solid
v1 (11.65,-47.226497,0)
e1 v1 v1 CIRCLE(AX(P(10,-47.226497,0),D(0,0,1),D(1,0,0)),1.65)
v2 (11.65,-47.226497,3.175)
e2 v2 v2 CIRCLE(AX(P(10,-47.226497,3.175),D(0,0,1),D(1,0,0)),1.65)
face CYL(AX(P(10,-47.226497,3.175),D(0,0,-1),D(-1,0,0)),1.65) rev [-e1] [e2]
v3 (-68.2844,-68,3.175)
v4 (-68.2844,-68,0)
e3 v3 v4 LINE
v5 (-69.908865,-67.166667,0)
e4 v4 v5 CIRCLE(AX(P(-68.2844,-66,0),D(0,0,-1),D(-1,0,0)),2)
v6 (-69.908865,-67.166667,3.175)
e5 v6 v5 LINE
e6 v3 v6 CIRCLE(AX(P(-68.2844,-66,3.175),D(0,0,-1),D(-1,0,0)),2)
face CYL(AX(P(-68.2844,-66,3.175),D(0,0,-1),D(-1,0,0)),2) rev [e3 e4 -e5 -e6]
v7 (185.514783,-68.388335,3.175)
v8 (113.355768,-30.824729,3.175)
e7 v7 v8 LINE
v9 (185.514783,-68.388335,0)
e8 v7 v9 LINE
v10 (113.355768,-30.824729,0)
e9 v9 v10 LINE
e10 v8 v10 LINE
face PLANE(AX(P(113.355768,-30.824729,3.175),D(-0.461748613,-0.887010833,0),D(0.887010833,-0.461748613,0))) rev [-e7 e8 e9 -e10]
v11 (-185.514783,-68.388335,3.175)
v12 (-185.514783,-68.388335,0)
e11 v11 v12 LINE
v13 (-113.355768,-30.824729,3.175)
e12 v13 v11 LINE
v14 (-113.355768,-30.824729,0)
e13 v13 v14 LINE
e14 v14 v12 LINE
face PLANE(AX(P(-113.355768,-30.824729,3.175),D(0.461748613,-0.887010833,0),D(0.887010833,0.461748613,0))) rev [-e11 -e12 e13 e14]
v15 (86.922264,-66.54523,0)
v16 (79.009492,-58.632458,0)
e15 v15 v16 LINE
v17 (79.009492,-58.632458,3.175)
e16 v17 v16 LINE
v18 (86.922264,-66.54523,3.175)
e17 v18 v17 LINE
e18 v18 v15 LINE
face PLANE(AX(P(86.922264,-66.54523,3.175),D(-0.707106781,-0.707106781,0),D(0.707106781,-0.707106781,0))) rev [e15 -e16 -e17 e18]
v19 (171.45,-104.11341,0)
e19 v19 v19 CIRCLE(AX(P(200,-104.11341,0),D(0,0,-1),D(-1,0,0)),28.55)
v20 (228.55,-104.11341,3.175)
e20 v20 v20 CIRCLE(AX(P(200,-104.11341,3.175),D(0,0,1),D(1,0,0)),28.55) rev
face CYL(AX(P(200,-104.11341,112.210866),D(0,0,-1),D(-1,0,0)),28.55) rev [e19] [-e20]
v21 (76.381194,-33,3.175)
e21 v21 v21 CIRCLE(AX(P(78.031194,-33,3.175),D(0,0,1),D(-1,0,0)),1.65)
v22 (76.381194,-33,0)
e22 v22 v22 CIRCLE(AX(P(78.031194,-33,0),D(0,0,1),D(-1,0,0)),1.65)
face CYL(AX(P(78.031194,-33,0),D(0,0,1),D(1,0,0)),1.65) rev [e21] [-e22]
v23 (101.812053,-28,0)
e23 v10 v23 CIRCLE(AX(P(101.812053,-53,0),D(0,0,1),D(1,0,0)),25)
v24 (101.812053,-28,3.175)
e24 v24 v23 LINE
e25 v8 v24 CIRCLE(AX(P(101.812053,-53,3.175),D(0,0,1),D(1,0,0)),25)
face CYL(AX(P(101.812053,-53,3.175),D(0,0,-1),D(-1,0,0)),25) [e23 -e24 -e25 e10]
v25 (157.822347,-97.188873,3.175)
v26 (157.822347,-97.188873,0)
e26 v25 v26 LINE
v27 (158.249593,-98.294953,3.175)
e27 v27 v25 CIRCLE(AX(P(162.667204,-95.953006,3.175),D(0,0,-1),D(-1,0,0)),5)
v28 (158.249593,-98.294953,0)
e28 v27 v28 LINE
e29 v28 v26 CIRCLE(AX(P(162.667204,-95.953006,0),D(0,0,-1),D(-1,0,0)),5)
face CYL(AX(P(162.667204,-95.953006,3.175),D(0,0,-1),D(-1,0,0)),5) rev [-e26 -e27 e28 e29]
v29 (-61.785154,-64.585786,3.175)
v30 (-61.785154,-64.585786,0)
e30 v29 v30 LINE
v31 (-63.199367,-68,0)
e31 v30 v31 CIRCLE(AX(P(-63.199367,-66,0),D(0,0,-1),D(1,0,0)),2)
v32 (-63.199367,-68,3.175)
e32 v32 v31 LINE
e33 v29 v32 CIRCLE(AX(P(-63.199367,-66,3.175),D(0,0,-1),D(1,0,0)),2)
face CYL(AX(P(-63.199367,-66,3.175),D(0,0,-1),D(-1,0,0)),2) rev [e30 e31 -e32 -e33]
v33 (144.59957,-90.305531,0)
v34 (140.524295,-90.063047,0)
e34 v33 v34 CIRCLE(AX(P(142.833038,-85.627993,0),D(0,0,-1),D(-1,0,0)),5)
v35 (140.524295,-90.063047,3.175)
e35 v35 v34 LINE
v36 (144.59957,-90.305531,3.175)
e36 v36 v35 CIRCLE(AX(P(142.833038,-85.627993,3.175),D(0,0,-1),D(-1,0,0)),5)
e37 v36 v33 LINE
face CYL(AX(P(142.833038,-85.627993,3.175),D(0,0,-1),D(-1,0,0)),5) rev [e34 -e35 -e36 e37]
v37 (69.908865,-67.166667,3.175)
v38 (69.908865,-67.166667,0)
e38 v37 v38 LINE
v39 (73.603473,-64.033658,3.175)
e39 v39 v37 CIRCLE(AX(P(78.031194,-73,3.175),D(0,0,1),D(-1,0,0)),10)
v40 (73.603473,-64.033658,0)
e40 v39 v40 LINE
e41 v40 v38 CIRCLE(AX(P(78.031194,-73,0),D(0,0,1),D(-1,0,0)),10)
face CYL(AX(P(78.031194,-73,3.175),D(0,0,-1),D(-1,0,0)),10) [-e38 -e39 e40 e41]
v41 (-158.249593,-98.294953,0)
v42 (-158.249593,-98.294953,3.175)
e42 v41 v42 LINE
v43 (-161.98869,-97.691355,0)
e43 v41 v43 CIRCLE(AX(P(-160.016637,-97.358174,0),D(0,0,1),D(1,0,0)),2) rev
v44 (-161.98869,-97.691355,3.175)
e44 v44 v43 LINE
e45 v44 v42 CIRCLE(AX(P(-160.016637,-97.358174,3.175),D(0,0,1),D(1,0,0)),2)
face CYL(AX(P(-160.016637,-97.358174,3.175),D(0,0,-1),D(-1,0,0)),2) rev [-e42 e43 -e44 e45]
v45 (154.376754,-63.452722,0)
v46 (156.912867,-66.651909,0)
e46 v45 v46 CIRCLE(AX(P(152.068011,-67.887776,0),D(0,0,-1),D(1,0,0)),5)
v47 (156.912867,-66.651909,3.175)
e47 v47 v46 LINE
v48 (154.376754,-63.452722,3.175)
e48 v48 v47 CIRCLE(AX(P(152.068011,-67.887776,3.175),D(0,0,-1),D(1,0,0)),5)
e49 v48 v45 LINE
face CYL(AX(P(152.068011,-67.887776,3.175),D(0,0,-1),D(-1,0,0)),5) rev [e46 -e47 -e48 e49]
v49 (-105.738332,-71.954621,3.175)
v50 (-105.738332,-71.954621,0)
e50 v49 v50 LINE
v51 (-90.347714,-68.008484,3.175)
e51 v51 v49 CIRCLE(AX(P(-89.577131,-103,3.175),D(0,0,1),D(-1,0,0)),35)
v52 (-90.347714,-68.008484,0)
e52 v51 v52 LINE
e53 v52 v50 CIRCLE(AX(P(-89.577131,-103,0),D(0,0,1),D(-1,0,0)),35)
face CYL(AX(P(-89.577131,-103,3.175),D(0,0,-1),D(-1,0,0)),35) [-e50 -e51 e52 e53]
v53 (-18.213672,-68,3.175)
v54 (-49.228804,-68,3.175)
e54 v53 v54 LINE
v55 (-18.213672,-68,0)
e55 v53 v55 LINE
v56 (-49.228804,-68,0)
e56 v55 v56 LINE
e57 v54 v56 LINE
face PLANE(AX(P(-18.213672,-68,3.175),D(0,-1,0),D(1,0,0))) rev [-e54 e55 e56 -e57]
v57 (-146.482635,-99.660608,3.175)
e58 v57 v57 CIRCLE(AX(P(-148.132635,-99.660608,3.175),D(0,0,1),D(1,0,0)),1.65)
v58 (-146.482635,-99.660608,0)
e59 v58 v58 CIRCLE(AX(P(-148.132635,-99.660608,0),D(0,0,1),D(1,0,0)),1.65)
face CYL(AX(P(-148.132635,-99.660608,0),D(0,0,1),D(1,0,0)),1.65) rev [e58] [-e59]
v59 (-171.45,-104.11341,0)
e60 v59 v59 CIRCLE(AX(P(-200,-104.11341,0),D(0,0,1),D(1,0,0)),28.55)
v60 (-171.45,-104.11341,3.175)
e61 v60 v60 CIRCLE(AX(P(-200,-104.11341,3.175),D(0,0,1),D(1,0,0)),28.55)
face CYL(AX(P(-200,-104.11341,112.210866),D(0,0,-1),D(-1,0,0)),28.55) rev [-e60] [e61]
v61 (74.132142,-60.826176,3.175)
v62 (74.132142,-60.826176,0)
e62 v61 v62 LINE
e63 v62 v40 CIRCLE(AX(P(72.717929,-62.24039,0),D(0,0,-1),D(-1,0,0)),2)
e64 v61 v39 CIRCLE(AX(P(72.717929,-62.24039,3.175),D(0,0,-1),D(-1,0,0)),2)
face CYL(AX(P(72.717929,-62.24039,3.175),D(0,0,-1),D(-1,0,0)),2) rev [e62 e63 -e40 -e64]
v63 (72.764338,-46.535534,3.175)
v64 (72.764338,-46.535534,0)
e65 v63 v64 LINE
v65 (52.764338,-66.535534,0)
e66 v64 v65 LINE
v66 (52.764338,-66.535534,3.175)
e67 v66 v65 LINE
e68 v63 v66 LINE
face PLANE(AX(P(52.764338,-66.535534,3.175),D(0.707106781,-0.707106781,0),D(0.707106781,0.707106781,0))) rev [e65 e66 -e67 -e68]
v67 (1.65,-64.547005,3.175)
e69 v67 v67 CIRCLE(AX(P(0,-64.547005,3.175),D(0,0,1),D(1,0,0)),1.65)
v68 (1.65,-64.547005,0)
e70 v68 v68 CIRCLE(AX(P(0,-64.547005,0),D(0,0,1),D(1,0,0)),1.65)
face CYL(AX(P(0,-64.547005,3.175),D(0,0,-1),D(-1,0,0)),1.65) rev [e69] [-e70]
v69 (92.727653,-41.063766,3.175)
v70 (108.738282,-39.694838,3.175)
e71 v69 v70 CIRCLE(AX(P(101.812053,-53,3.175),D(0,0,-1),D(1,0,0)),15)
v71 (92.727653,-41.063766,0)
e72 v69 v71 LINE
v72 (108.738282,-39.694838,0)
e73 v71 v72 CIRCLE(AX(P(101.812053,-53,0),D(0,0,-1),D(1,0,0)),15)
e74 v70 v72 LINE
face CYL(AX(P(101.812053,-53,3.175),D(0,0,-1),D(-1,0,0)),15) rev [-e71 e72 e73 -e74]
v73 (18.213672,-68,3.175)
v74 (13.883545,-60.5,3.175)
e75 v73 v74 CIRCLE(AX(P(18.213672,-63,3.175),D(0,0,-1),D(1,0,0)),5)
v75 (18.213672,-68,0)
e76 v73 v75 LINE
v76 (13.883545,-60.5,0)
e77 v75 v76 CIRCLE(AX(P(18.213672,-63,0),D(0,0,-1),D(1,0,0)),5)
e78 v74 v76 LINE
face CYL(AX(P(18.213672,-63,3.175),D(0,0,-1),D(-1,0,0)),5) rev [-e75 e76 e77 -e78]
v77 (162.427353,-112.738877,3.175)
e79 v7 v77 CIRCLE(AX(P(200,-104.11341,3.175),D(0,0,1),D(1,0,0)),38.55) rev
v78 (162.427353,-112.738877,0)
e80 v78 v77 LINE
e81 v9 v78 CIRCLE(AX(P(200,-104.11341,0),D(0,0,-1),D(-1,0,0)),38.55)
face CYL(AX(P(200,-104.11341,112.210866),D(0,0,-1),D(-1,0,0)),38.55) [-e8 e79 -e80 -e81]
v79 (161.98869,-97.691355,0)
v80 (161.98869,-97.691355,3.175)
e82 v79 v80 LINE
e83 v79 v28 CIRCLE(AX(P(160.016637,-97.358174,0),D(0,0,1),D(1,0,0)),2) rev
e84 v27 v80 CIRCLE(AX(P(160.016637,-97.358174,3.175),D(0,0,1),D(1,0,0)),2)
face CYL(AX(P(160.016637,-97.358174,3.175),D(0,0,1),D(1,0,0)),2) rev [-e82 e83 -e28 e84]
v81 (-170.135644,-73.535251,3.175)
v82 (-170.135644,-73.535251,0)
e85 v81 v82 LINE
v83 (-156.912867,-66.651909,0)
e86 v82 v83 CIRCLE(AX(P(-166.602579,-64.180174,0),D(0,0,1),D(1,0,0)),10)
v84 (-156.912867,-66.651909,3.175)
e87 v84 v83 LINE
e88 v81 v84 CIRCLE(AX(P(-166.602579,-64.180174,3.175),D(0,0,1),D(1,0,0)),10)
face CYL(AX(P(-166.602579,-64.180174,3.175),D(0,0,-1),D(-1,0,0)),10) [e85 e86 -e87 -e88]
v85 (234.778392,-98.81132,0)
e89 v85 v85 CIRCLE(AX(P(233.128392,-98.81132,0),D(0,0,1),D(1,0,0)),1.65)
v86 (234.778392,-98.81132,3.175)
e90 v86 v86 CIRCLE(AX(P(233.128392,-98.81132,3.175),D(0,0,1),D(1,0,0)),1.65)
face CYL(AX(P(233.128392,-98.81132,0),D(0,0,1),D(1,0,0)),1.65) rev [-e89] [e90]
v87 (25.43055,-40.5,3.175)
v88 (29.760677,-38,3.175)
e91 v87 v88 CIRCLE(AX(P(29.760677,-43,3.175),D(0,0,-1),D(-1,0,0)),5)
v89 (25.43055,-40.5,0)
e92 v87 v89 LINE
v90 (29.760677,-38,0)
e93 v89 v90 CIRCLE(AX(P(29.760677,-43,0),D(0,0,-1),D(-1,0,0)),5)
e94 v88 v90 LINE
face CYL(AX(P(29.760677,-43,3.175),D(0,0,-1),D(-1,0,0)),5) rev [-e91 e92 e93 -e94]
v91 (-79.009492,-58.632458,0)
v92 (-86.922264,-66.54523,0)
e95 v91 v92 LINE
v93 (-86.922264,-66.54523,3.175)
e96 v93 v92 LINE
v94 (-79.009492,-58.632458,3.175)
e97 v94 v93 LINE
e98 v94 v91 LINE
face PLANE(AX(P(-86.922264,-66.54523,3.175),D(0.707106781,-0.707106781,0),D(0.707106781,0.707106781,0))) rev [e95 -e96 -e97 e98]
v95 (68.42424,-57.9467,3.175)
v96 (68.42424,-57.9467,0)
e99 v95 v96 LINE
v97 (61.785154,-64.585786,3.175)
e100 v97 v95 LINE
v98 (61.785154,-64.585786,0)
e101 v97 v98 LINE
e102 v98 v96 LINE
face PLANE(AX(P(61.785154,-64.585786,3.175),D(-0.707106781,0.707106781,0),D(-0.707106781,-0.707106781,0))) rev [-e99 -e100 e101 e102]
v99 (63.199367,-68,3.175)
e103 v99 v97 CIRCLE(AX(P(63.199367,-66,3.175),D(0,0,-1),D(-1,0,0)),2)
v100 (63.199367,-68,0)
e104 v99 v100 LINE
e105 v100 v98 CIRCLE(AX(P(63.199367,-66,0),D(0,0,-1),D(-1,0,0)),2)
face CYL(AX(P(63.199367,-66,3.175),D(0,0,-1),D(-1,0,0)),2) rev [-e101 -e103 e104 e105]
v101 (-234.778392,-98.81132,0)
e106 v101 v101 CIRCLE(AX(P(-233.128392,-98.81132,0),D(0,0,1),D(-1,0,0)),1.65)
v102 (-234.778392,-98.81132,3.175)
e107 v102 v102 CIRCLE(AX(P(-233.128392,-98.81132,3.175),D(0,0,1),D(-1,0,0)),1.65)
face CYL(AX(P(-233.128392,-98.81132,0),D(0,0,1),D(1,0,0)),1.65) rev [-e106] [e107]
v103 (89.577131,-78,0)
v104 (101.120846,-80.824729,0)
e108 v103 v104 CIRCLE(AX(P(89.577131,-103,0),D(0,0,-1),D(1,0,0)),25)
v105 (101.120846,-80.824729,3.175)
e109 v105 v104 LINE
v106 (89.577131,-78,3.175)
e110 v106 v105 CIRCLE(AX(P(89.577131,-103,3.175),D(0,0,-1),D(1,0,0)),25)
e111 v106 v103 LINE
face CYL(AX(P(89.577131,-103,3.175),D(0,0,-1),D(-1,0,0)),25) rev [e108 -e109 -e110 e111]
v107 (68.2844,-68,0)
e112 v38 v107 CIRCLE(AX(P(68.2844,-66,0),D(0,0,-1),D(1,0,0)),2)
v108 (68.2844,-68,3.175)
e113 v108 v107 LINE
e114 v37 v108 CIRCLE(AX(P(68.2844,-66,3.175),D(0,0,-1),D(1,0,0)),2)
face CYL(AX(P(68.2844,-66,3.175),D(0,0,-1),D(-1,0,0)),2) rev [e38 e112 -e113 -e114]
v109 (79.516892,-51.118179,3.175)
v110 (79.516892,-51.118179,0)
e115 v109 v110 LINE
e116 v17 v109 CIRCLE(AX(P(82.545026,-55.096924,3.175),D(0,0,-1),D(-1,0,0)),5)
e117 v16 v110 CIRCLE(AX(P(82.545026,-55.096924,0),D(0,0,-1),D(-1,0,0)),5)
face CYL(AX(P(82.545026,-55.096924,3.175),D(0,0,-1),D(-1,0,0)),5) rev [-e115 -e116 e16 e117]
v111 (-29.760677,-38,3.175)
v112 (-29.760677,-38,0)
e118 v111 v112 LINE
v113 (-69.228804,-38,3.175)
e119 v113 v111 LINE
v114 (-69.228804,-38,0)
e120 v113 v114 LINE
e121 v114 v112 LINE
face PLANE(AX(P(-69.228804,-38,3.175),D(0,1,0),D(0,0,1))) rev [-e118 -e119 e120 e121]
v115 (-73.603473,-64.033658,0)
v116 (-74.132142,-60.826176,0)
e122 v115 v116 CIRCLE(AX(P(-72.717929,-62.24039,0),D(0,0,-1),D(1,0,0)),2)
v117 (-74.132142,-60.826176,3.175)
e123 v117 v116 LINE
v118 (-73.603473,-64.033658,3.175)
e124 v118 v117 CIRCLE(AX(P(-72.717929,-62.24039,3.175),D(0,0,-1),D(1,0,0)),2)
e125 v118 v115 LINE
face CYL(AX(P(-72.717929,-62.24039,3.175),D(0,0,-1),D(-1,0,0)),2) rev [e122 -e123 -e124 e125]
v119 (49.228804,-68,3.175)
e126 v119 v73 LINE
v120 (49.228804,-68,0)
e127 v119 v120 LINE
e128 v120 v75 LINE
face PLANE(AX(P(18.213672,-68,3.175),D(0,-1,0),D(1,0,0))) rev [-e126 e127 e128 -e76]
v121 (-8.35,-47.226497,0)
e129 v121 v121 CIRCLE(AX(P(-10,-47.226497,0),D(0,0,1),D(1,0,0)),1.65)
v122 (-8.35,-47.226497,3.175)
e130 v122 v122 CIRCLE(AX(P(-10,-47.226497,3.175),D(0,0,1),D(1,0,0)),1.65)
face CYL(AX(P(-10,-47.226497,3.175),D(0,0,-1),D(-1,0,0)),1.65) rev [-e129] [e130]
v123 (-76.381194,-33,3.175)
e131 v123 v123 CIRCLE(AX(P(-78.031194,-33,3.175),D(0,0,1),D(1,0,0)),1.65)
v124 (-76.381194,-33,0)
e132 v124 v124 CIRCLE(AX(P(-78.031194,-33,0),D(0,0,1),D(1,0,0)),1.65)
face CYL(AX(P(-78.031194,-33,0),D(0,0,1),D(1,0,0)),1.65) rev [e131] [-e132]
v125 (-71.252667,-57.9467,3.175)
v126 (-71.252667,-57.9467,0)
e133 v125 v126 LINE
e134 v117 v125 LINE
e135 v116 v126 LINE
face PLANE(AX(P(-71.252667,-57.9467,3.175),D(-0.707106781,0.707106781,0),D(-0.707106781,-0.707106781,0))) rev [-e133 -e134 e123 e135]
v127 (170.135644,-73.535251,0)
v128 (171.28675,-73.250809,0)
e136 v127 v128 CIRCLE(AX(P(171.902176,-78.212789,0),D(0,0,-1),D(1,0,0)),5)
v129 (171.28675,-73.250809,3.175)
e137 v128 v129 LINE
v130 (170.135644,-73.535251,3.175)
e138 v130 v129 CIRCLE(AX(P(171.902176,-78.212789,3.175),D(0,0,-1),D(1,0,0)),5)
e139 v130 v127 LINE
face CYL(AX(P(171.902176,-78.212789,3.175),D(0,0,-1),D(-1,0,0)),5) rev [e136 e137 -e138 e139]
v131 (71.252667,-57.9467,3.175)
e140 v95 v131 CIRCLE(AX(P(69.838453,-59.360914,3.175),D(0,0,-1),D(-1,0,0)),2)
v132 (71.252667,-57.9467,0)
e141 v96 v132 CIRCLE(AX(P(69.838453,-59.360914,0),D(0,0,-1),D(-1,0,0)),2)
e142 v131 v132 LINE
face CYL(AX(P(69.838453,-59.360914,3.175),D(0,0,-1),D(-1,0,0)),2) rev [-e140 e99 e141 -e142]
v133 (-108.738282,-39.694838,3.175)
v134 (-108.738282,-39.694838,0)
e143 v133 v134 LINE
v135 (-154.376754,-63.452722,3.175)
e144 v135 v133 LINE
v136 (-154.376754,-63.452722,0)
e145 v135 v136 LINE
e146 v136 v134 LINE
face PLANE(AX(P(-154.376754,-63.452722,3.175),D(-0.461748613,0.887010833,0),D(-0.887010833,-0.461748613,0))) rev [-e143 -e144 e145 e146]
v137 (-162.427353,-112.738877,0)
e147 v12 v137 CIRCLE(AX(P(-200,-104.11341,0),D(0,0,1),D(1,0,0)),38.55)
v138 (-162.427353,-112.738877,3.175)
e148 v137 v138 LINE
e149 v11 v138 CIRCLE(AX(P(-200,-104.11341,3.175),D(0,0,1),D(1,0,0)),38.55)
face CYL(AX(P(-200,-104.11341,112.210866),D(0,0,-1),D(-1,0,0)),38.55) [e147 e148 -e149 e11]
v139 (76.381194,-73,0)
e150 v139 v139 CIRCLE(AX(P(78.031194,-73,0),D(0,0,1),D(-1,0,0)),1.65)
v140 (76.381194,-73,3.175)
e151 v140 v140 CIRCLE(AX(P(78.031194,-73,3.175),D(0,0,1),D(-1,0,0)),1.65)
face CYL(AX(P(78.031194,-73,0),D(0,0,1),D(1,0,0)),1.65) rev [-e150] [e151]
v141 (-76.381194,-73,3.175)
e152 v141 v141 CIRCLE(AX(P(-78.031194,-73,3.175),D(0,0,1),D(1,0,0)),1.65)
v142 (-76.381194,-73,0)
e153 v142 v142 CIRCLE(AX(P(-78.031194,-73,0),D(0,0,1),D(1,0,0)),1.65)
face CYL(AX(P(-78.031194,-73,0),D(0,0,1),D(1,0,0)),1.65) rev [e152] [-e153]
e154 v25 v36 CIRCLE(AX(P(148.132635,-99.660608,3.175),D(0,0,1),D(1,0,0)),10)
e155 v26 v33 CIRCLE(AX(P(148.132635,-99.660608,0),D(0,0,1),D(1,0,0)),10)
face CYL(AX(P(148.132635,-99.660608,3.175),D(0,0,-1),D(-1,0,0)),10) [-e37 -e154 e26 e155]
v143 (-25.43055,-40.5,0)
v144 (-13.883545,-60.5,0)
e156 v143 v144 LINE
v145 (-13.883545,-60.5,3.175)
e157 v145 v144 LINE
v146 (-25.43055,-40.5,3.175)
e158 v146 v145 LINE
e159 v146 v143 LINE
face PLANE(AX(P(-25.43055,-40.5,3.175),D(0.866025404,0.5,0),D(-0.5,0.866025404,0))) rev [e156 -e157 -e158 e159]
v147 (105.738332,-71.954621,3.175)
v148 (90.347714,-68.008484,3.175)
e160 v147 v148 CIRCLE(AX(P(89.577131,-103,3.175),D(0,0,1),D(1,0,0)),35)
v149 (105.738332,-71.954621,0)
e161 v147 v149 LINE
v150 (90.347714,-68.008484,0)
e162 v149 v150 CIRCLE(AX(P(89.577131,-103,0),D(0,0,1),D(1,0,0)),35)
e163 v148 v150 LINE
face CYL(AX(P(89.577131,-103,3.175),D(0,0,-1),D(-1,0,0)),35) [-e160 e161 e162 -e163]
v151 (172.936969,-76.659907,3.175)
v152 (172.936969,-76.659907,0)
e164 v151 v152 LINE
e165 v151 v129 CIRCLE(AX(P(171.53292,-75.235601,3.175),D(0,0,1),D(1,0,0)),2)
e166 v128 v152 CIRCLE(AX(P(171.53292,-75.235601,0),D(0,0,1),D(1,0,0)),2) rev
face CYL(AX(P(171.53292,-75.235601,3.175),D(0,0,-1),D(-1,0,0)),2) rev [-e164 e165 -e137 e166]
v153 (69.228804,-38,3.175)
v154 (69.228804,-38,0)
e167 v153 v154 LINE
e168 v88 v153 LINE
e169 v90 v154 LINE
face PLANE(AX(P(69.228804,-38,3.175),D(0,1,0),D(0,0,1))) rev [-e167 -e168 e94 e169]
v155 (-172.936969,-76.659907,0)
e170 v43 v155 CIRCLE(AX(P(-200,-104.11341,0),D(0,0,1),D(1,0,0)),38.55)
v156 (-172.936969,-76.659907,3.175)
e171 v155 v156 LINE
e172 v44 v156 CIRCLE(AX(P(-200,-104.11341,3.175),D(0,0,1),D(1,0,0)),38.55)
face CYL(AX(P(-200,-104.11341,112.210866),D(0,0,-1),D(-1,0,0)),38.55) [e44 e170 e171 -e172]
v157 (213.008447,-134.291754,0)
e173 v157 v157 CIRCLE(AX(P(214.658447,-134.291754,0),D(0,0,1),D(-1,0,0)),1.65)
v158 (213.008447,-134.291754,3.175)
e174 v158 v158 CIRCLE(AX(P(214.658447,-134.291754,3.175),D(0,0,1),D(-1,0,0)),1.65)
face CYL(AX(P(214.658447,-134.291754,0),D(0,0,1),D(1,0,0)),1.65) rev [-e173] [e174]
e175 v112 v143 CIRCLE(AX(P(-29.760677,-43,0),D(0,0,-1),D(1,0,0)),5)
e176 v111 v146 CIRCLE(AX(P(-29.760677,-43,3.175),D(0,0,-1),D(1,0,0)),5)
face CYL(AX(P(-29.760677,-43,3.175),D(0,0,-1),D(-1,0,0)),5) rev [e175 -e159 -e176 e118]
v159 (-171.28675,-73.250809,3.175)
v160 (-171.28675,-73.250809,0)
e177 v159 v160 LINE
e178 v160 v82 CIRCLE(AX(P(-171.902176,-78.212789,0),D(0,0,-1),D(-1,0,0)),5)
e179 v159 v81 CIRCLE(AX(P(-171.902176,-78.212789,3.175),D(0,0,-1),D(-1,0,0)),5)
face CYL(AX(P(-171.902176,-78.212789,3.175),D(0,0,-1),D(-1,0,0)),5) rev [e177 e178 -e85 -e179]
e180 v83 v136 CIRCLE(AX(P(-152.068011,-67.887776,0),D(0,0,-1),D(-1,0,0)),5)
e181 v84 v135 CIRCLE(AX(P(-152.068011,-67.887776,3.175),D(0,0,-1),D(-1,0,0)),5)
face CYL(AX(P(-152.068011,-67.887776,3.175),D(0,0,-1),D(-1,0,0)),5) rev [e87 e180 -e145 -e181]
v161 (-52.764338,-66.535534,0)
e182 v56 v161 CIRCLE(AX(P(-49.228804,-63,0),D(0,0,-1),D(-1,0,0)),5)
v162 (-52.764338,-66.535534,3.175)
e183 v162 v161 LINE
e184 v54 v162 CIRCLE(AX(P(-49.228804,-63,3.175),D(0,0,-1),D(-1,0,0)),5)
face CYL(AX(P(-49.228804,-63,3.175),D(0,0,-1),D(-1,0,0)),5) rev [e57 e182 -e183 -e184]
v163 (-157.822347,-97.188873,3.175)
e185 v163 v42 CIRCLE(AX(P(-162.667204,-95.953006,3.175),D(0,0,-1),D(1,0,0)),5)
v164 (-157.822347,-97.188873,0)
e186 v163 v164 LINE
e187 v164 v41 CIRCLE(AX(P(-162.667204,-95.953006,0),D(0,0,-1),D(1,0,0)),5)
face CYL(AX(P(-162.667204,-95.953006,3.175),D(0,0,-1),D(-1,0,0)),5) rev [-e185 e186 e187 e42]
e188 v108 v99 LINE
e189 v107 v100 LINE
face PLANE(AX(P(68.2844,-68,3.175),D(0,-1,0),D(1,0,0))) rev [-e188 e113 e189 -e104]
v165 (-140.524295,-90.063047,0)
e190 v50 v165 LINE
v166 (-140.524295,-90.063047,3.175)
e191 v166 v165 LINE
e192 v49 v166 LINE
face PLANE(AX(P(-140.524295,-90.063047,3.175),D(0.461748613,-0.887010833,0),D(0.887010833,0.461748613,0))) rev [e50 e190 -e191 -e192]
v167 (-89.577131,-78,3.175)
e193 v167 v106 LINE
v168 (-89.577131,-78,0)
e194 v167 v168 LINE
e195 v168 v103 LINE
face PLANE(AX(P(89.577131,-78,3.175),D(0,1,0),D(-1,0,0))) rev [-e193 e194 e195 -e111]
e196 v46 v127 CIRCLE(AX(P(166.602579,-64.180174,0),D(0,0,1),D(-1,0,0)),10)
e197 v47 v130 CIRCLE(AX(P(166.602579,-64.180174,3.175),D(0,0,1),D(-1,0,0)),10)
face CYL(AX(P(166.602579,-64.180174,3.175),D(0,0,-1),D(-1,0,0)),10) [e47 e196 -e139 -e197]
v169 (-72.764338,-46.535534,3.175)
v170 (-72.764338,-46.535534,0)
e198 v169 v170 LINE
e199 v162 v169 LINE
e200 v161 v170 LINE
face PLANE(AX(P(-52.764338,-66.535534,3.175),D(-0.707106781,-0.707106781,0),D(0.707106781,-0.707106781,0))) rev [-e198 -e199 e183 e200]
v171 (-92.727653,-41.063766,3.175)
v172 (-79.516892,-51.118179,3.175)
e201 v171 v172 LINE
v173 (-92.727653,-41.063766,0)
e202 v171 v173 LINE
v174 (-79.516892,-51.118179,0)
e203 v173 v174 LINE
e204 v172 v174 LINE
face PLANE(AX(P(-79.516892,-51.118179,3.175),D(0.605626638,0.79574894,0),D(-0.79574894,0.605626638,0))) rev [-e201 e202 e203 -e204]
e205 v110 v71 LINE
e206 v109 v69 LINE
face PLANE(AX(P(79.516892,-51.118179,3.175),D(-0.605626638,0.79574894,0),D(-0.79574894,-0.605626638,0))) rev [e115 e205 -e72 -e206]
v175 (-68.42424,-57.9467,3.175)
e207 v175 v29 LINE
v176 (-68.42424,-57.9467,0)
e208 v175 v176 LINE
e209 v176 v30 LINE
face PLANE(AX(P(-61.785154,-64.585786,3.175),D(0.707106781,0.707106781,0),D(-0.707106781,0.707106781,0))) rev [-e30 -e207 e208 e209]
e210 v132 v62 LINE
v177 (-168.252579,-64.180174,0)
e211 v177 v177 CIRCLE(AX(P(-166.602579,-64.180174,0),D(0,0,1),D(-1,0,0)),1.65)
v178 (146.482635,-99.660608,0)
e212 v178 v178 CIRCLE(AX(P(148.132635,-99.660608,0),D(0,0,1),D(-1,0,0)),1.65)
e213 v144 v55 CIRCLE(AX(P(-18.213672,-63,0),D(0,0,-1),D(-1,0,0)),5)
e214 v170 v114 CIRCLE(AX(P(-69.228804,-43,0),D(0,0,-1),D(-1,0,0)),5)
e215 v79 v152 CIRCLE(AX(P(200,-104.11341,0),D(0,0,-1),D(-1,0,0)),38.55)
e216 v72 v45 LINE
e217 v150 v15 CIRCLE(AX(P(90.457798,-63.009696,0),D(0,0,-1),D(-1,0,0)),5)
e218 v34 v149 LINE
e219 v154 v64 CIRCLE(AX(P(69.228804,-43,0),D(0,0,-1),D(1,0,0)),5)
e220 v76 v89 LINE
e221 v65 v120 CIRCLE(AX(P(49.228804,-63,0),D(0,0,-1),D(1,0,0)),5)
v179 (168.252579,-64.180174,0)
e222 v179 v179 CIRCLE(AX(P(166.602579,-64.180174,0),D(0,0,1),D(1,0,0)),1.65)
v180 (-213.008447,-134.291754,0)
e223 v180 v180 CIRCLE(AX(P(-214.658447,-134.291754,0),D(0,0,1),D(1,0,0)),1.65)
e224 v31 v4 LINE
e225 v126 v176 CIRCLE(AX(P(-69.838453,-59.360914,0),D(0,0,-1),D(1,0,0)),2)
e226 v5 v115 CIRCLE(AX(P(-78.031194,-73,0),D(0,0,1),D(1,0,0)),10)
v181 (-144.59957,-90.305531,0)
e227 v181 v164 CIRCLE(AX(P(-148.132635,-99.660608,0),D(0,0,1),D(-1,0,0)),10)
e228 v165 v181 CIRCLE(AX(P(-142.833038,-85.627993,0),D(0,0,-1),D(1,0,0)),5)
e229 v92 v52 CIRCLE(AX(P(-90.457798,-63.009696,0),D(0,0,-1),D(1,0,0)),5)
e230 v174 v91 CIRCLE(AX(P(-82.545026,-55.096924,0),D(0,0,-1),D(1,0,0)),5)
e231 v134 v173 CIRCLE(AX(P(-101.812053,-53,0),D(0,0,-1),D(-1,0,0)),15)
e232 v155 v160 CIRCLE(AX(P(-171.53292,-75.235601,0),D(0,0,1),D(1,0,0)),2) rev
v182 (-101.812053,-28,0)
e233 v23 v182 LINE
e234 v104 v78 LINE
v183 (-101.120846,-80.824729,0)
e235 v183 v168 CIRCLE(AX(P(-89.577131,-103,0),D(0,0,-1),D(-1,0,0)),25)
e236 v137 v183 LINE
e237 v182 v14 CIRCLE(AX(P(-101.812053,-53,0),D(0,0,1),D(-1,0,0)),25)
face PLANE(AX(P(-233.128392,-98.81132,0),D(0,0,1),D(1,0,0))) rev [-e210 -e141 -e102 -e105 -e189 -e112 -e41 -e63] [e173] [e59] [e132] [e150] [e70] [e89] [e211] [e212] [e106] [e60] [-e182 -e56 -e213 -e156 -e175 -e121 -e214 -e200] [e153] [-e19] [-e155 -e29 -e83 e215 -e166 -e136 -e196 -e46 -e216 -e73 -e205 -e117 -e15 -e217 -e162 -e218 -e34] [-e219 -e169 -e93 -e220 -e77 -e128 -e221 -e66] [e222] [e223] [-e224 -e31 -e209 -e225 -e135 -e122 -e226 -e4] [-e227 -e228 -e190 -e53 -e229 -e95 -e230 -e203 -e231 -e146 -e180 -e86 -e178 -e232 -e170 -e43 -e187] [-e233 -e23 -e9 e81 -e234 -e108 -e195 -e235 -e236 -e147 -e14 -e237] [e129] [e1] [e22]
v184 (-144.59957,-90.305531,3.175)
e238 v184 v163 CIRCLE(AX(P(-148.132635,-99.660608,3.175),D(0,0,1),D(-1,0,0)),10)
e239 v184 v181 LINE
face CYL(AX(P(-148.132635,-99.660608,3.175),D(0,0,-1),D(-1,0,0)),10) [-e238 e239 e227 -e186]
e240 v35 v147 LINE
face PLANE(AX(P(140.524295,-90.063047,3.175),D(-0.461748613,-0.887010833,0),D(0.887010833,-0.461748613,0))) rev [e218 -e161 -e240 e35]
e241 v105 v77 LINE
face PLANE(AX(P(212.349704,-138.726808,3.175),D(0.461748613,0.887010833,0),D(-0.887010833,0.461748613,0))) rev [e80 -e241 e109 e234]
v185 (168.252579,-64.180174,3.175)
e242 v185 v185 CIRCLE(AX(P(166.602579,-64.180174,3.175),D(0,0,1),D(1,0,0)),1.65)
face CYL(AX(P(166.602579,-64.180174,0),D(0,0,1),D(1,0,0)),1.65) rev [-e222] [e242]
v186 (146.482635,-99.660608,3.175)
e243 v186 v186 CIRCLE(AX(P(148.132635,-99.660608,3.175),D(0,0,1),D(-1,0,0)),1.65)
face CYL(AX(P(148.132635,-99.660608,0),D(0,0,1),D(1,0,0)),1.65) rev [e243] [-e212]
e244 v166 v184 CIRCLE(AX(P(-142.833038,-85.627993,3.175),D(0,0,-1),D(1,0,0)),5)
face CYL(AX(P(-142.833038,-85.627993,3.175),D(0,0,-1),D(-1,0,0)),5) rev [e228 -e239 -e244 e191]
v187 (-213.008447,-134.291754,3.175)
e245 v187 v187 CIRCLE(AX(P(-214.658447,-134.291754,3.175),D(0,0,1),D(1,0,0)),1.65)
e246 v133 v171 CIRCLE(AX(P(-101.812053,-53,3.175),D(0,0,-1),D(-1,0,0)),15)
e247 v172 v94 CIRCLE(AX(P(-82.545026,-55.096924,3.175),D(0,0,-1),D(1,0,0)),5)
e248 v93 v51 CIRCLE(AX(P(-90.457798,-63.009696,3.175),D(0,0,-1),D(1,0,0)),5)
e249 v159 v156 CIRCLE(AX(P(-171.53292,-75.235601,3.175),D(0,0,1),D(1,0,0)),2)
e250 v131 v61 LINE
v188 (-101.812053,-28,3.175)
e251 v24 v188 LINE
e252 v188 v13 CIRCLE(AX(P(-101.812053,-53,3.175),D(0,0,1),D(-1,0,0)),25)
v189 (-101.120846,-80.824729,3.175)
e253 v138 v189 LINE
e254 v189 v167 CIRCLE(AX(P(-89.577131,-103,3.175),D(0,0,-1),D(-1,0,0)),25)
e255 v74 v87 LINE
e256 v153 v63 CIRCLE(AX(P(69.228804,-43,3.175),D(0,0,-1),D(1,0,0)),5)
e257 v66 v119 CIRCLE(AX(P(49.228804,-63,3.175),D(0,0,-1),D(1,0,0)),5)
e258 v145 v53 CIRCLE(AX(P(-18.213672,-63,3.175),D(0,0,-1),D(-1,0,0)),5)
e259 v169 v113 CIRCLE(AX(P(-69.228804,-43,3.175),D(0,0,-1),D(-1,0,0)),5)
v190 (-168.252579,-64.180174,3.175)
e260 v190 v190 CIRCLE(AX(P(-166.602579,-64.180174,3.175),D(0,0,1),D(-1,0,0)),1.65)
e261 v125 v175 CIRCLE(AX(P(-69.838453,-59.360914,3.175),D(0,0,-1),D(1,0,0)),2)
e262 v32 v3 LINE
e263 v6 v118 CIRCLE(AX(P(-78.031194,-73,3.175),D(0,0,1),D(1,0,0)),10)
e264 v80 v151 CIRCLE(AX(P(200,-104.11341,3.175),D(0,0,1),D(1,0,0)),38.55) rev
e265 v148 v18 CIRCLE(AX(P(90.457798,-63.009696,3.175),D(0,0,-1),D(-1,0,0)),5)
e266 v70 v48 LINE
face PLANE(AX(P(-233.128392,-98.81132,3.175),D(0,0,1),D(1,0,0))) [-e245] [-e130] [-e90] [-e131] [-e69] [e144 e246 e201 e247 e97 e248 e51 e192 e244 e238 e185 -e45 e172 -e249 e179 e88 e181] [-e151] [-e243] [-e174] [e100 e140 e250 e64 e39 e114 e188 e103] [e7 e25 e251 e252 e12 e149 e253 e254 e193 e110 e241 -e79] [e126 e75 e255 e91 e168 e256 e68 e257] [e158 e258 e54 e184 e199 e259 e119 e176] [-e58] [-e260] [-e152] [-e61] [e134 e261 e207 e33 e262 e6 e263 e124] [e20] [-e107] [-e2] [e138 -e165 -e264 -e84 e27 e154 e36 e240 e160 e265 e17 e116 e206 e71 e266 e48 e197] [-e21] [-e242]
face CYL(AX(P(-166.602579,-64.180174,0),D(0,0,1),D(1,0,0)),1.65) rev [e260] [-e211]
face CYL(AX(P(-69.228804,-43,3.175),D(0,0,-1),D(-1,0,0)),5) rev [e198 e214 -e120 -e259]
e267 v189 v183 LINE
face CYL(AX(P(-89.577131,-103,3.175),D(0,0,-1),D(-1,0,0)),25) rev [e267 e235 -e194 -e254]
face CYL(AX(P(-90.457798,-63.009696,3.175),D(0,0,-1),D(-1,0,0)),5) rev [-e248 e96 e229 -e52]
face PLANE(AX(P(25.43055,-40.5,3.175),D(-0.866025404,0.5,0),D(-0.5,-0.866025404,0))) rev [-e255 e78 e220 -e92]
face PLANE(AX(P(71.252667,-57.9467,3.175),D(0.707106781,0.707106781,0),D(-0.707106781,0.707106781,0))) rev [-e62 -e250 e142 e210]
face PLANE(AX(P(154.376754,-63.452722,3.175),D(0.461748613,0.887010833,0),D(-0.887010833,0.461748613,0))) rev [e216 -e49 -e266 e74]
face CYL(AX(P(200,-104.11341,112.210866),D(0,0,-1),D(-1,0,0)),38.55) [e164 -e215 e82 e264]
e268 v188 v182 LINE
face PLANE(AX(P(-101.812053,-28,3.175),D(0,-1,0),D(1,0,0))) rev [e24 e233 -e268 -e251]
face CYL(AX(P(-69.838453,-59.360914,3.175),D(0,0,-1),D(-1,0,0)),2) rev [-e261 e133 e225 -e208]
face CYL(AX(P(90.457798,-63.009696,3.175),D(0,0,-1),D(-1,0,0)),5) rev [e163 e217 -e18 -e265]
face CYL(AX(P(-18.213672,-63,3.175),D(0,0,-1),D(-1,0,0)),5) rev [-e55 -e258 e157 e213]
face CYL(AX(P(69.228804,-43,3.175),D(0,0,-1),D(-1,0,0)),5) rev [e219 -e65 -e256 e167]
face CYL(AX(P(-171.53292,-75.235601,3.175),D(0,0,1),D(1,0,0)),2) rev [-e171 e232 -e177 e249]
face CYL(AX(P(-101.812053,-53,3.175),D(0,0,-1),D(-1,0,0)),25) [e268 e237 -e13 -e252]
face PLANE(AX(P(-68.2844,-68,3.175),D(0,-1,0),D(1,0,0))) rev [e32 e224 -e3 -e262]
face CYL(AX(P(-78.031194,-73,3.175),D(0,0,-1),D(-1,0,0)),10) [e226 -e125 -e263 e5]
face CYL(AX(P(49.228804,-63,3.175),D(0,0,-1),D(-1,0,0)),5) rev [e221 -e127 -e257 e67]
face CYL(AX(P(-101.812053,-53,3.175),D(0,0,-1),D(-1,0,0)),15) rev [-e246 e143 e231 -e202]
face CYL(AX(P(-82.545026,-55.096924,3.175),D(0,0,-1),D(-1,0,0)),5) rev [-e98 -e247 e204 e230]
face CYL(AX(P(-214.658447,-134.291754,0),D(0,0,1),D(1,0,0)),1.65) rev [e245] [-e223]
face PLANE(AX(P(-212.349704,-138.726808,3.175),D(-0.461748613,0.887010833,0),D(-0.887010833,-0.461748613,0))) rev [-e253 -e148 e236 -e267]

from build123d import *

# Parameters (mm, degrees)
SKETCH1_R              = 16.05
SKETCH1_R_2            = 1.65
BASE_DEPTH             = 3.175
SKETCH3_R              = 1.65
STRUT_HOLES_DEPTH      = 276.893827895
LIGHTENING_HOLES_DEPTH = 276.893827895
INNER_START            = -3.175
SKETCH5_R              = 38.55
SKETCH5_R_2            = 28.55
SKETCH5_R_3            = 1.65
INNER_MOD_BOSS_DEPTH   = 3.175
SKETCH5_2_R            = 28.55
INNER_MOD_CUT_DEPTH    = 278.97307731
FILLET1_R              = 2
FILLET2_R              = 2
FILLET3_R              = 2
FILLET4_R              = 2


with BuildPart() as part:
    # Sketch1 → Base (new body)
    with BuildSketch(Plane.XY):
        with BuildLine():
            Line((-113.35576806, -30.824729171), (-235.437134887, -94.376266227))
            ThreePointArc((-235.437134887, -94.376266227), (-237.896976574, -97.307791395), (-237.563445987, -101.120063459))
            Line((-237.563445987, -101.120063459), (-219.093501457, -136.600496786))
            ThreePointArc((-219.093501457, -136.600496786), (-216.161976289, -139.060338474), (-212.349704225, -138.726807886))
            Line((-212.349704225, -138.726807886), (-101.120845899, -80.824729171))
            ThreePointArc((-101.120845899, -80.824729171), (-95.519277876, -78.716448255), (-89.577130568, -78))
            Line((-89.577130568, -78), (89.577130568, -78))
            ThreePointArc((89.577130568, -78), (95.519277876, -78.716448255), (101.120845899, -80.824729171))
            Line((101.120845899, -80.824729171), (212.349704225, -138.726807886))
            ThreePointArc((212.349704225, -138.726807886), (216.161976289, -139.060338474), (219.093501457, -136.600496786))
            Line((219.093501457, -136.600496786), (237.563445987, -101.120063459))
            ThreePointArc((237.563445987, -101.120063459), (237.896976574, -97.307791395), (235.437134887, -94.376266227))
            Line((235.437134887, -94.376266227), (113.35576806, -30.824729171))
            ThreePointArc((113.35576806, -30.824729171), (107.754200038, -28.716448255), (101.812052729, -28))
            Line((101.812052729, -28), (-101.812052729, -28))
            ThreePointArc((-101.812052729, -28), (-107.754200038, -28.716448255), (-113.35576806, -30.824729171))
        make_face()
        with Locations((-200, -104.11341011)):
            Circle(SKETCH1_R, mode=Mode.SUBTRACT)
        with Locations((-221.458631392, -97.347529622)):
            Circle(SKETCH1_R_2, mode=Mode.SUBTRACT)
        with Locations((-193.234119511, -82.654778719)):
            Circle(SKETCH1_R_2, mode=Mode.SUBTRACT)
        with Locations((-178.541368608, -110.879290599)):
            Circle(SKETCH1_R_2, mode=Mode.SUBTRACT)
        with Locations((-206.765880489, -125.572041502)):
            Circle(SKETCH1_R_2, mode=Mode.SUBTRACT)
        with Locations(Location((206.765880489, -125.572041502, 0), (0, 0, 180))):
            Circle(SKETCH1_R_2, mode=Mode.SUBTRACT)
        with Locations(Location((221.458631392, -97.347529622, 0), (0, 0, 180))):
            Circle(SKETCH1_R_2, mode=Mode.SUBTRACT)
        with Locations(Location((193.234119511, -82.654778719, 0), (0, 0, 180))):
            Circle(SKETCH1_R_2, mode=Mode.SUBTRACT)
        with Locations(Location((178.541368608, -110.879290599, 0), (0, 0, 180))):
            Circle(SKETCH1_R_2, mode=Mode.SUBTRACT)
        with Locations(Location((200, -104.11341011, 0), (0, 0, 180))):
            Circle(SKETCH1_R, mode=Mode.SUBTRACT)
        with Locations((-10, -47.226497308)):
            Circle(SKETCH1_R_2, mode=Mode.SUBTRACT)
        with Locations((10, -47.226497308)):
            Circle(SKETCH1_R_2, mode=Mode.SUBTRACT)
        with Locations((0, -64.547005384)):
            Circle(SKETCH1_R_2, mode=Mode.SUBTRACT)
    extrude(amount=BASE_DEPTH)

    # Sketch3 → Strut Holes (cut, through all)
    with BuildSketch(Plane.XY.offset(3.175)):
        with Locations((-214.658447291, -134.29175372)):
            Circle(SKETCH3_R)
        with Locations((-148.132634803, -99.660607727)):
            Circle(SKETCH3_R)
        with Locations((-78.03119405, -73)):
            Circle(SKETCH3_R)
        with Locations((-78.03119405, -33)):
            Circle(SKETCH3_R)
        with Locations(Location((-166.602579332, -64.1801744, 0), (0, 0, 180))):
            Circle(SKETCH3_R)
        with Locations(Location((-233.128391821, -98.811320393, 0), (0, 0, 180))):
            Circle(SKETCH3_R)
        with Locations((233.128391821, -98.811320393)):
            Circle(SKETCH3_R)
        with Locations((166.602579332, -64.1801744)):
            Circle(SKETCH3_R)
        with Locations(Location((78.03119405, -33, 0), (0, 0, 180))):
            Circle(SKETCH3_R)
        with Locations(Location((78.03119405, -73, 0), (0, 0, 180))):
            Circle(SKETCH3_R)
        with Locations(Location((148.132634803, -99.660607727, 0), (0, 0, 180))):
            Circle(SKETCH3_R)
        with Locations(Location((214.658447291, -134.29175372, 0), (0, 0, 180))):
            Circle(SKETCH3_R)
    extrude(amount=-STRUT_HOLES_DEPTH, mode=Mode.SUBTRACT)

    # Sketch4 → Lightening Holes (cut, through all)
    with BuildSketch(Plane(origin=(0, 0, 0), x_dir=(-1, 0, 0), z_dir=(0, 0, -1))):
        with BuildLine():
            Line((-166.732564066, -103.70620831), (-160.358460468, -100.38806))
            ThreePointArc((-160.358460468, -100.38806), (-158.749015825, -99.059097441), (-157.82234729, -97.188873132))
            ThreePointArc((-157.82234729, -97.188873132), (-152.750120935, -90.790499395), (-144.599570492, -90.305531214))
            ThreePointArc((-144.599570492, -90.305531214), (-142.53605719, -90.619165384), (-140.52429527, -90.063047123))
            Line((-140.52429527, -90.063047123), (-105.738332031, -71.954620839))
            ThreePointArc((-105.738332031, -71.954620839), (-98.269905543, -69.096671797), (-90.347714306, -68.008483875))
            ThreePointArc((-90.347714306, -68.008483875), (-88.493641512, -67.607748759), (-86.922263791, -66.545229763))
            Line((-86.922263791, -66.545229763), (-79.009491694, -58.632457666))
            ThreePointArc((-79.009491694, -58.632457666), (-77.556385787, -54.760066484), (-79.516892411, -51.11817906))
            Line((-79.516892411, -51.11817906), (-92.727653164, -41.063765898))
            ThreePointArc((-92.727653164, -41.063765898), (-100.534196684, -38.054529652), (-108.738281928, -39.694837502))
            Line((-108.738281928, -39.694837502), (-154.376753667, -63.452722127))
            ThreePointArc((-154.376753667, -63.452722127), (-155.986198311, -64.781684686), (-156.912866845, -66.651908996))
            ThreePointArc((-156.912866845, -66.651908996), (-161.9850932, -73.050282732), (-170.135643643, -73.535250914))
            ThreePointArc((-170.135643643, -73.535250914), (-172.199156946, -73.221616743), (-174.210918865, -73.777735004))
            Line((-174.210918865, -73.777735004), (-180.585022463, -77.095883315))
            ThreePointArc((-180.585022463, -77.095883315), (-182.645072259, -79.099137955), (-183.262226102, -81.905551227))
            ThreePointArc((-183.262226102, -81.905551227), (-183.239750678, -82.990325484), (-183.334932996, -84.071149549))
            ThreePointArc((-183.334932996, -84.071149549), (-183.171057415, -86.227404823), (-182.1120053, -88.112796196))
            ThreePointArc((-182.1120053, -88.112796196), (-178.711740004, -93.031443393), (-176.632932149, -98.637997792))
            ThreePointArc((-176.632932149, -98.637997792), (-175.695957289, -100.586938562), (-174.023651545, -101.957954795))
            ThreePointArc((-174.023651545, -101.957954795), (-173.083697968, -102.499921221), (-172.207994291, -103.140532962))
            ThreePointArc((-172.207994291, -103.140532962), (-169.555130221, -104.244682653), (-166.732564066, -103.70620831))
        make_face()
        with BuildLine():
            Line((-68.284399705, -68), (-63.199367137, -68))
            ThreePointArc((-63.199367137, -68), (-61.351608072, -66.765366865), (-61.785153575, -64.585786438))
            Line((-61.785153575, -64.585786438), (-68.424239552, -57.946700461))
            ThreePointArc((-68.424239552, -57.946700461), (-69.838453114, -57.360914023), (-71.252666676, -57.946700461))
            Line((-71.252666676, -57.946700461), (-74.132142401, -60.826176185))
            ThreePointArc((-74.132142401, -60.826176185), (-74.691303243, -62.565648815), (-73.60347304, -64.033658123))
            ThreePointArc((-73.60347304, -64.033658123), (-71.563592326, -65.373065627), (-69.908865429, -67.166666667))
            ThreePointArc((-69.908865429, -67.166666667), (-69.197270634, -67.779513042), (-68.284399705, -68))
        make_face()
        with BuildLine():
            Line((-25.430550415, -40.5), (-13.883545032, -60.5))
            ThreePointArc((-13.883545032, -60.5), (-13.883545032, -65.5), (-18.21367205, -68))
            Line((-18.21367205, -68), (-49.228804389, -68))
            ThreePointArc((-49.228804389, -68), (-51.14222155, -67.619397663), (-52.764338294, -66.535533906))
            Line((-52.764338294, -66.535533906), (-72.764338294, -46.535533906))
            ThreePointArc((-72.764338294, -46.535533906), (-73.848202051, -41.086582838), (-69.228804389, -38))
            Line((-69.228804389, -38), (-29.760677434, -38))
            ThreePointArc((-29.760677434, -38), (-27.260677434, -38.669872981), (-25.430550415, -40.5))
        make_face()
        with BuildLine():
            Line((52.764338294, -66.535533906), (72.764338294, -46.535533906))
            ThreePointArc((72.764338294, -46.535533906), (73.848202051, -41.086582838), (69.228804389, -38))
            Line((69.228804389, -38), (29.760677434, -38))
            ThreePointArc((29.760677434, -38), (27.260677434, -38.669872981), (25.430550415, -40.5))
            Line((25.430550415, -40.5), (13.883545032, -60.5))
            ThreePointArc((13.883545032, -60.5), (13.883545032, -65.5), (18.21367205, -68))
            Line((18.21367205, -68), (49.228804389, -68))
            ThreePointArc((49.228804389, -68), (51.14222155, -67.619397663), (52.764338294, -66.535533906))
        make_face()
        with BuildLine():
            Line((68.284399705, -68), (63.199367137, -68))
            ThreePointArc((63.199367137, -68), (61.351608072, -66.765366865), (61.785153575, -64.585786438))
            Line((61.785153575, -64.585786438), (68.424239552, -57.946700461))
            ThreePointArc((68.424239552, -57.946700461), (69.838453114, -57.360914023), (71.252666676, -57.946700461))
            Line((71.252666676, -57.946700461), (74.132142401, -60.826176185))
            ThreePointArc((74.132142401, -60.826176185), (74.691303243, -62.565648815), (73.60347304, -64.033658123))
            ThreePointArc((73.60347304, -64.033658123), (71.563592326, -65.373065627), (69.908865429, -67.166666667))
            ThreePointArc((69.908865429, -67.166666667), (69.197270634, -67.779513042), (68.284399705, -68))
        make_face()
        with BuildLine():
            Line((154.376753667, -63.452722127), (108.738281928, -39.694837502))
            ThreePointArc((108.738281928, -39.694837502), (100.534196684, -38.054529652), (92.727653164, -41.063765898))
            Line((92.727653164, -41.063765898), (79.516892411, -51.11817906))
            ThreePointArc((79.516892411, -51.11817906), (77.556385787, -54.760066484), (79.009491694, -58.632457666))
            Line((79.009491694, -58.632457666), (86.922263791, -66.545229763))
            ThreePointArc((86.922263791, -66.545229763), (88.493641512, -67.607748759), (90.347714306, -68.008483875))
            ThreePointArc((90.347714306, -68.008483875), (98.269905543, -69.096671797), (105.738332031, -71.954620839))
            Line((105.738332031, -71.954620839), (140.52429527, -90.063047123))
            ThreePointArc((140.52429527, -90.063047123), (142.53605719, -90.619165384), (144.599570492, -90.305531214))
            ThreePointArc((144.599570492, -90.305531214), (152.750120935, -90.790499395), (157.82234729, -97.188873132))
            ThreePointArc((157.82234729, -97.188873132), (158.749015825, -99.059097441), (160.358460468, -100.38806))
            Line((160.358460468, -100.38806), (166.732564066, -103.70620831))
            ThreePointArc((166.732564066, -103.70620831), (169.555130221, -104.244682653), (172.207994291, -103.140532962))
            ThreePointArc((172.207994291, -103.140532962), (173.083697968, -102.499921221), (174.023651545, -101.957954795))
            ThreePointArc((174.023651545, -101.957954795), (175.695957289, -100.586938562), (176.632932149, -98.637997792))
            ThreePointArc((176.632932149, -98.637997792), (178.711740004, -93.031443393), (182.1120053, -88.112796196))
            ThreePointArc((182.1120053, -88.112796196), (183.171057415, -86.227404823), (183.334932996, -84.071149549))
            ThreePointArc((183.334932996, -84.071149549), (183.239750678, -82.990325484), (183.262226102, -81.905551227))
            ThreePointArc((183.262226102, -81.905551227), (182.645072259, -79.099137955), (180.585022463, -77.095883315))
            Line((180.585022463, -77.095883315), (174.210918865, -73.777735004))
            ThreePointArc((174.210918865, -73.777735004), (172.199156946, -73.221616743), (170.135643643, -73.535250914))
            ThreePointArc((170.135643643, -73.535250914), (161.9850932, -73.050282732), (156.912866845, -66.651908996))
            ThreePointArc((156.912866845, -66.651908996), (155.986198311, -64.781684686), (154.376753667, -63.452722127))
        make_face()
    extrude(amount=-LIGHTENING_HOLES_DEPTH, mode=Mode.SUBTRACT)

    # Sketch5 → Inner Mod Boss (add)
    with BuildSketch(Plane(origin=(0, 0, 0), x_dir=(-1, 0, 0), z_dir=(0, 0, -1)).offset(INNER_START)):
        with Locations((-200, -104.11341011)):
            Circle(SKETCH5_R)
        with Locations((-200, -104.11341011)):
            Circle(SKETCH5_R_2, mode=Mode.SUBTRACT)
        with Locations(Location((-233.128391821, -98.811320393, 0), (0, 0, 180))):
            Circle(SKETCH5_R_3, mode=Mode.SUBTRACT)
        with Locations((-214.658447291, -134.29175372)):
            Circle(SKETCH5_R_3, mode=Mode.SUBTRACT)
    inner_mod_boss = extrude(amount=INNER_MOD_BOSS_DEPTH)

    # Sketch5<2> → Inner Mod Cut (cut, through all)
    with BuildSketch(Plane(origin=(0, 0, 0), x_dir=(-1, 0, 0), z_dir=(0, 0, -1))):
        with Locations((-200, -104.11341011)):
            Circle(SKETCH5_2_R)
    inner_mod_cut = extrude(amount=-INNER_MOD_CUT_DEPTH, mode=Mode.SUBTRACT)

    # Fillet1
    # the kernel refuses this fillet: 2 mm, written as the material it adds along each edge
    with BuildSketch(Plane(origin=(175.426696045, -74.410628545, 0), x_dir=(-0.742029638604563, -0.670367075140465, 0), z_dir=(0, 0, 1))) as fillet1_piece_1:
        with BuildLine():
            CenterArc((3.442331352, -1.998105223), FILLET1_R, 92.494227137, 142.480562551)
            Line((2.294457731, -3.635904402), (2.179670369, -3.79968432))
            ThreePointArc((2.179670369, -3.79968432), (0.290420907, -1.354372209), (-0.187450803, -0.069729452))
            Line((-0.187450803, -0.069729452), (0.008703746, 0.199810522))
            ThreePointArc((0.008703746, 0.199810522), (1.677646948, 0.16347817), (3.346590151, 0.199810522))
            Line((3.346590151, 0.199810522), (3.355293896, 0))
        make_face()
    extrude(amount=3.175)
    # the kernel refuses this fillet: 2 mm, written as the material it takes off along each edge

    # Fillet2
    # the kernel refuses this fillet: 2 mm, written as the material it adds along each edge
    with BuildSketch(Plane(origin=(161.574237648, -101.02095354, 0), x_dir=(0.1235218442476911, 0.9923418533920904, 0), z_dir=(0, 0, 1))) as fillet2_piece_1:
        with BuildLine():
            CenterArc((3.442331352, 1.998105223), FILLET2_R, 125.025210311, 142.480562551)
            Line((2.294457731, 3.635904402), (2.179670369, 3.79968432))
            ThreePointArc((2.179670369, 3.79968432), (0.290420907, 1.354372209), (-0.187450803, 0.069729452))
            Line((-0.187450803, 0.069729452), (0.008703746, -0.199810522))
            ThreePointArc((0.008703746, -0.199810522), (1.677646948, -0.16347817), (3.346590151, -0.199810522))
            Line((3.346590151, -0.199810522), (3.355293896, 0))
        make_face()
    extrude(amount=3.175)
    # the kernel refuses this fillet: 2 mm, written as the material it takes off along each edge

    # Mirror1: Inner Mod Boss, Inner Mod Cut across plane
    add(inner_mod_boss.mirror(Plane(origin=(0, 0, 0), x_dir=(0, 0, 1), z_dir=(1, 0, 0))))
    add(inner_mod_cut.mirror(Plane(origin=(0, 0, 0), x_dir=(0, 0, 1), z_dir=(1, 0, 0))), mode=Mode.SUBTRACT)

    # Fillet3
    # the kernel refuses this fillet: 2 mm, written as the material it adds along each edge
    with BuildSketch(Plane(origin=(-175.426696045, -74.410628545, 0), x_dir=(0.742029638604563, -0.670367075140465, 0), z_dir=(0, 0, 1))) as fillet3_piece_1:
        with BuildLine():
            CenterArc((3.442331352, 1.998105223), FILLET3_R, 125.025210311, 142.480562551)
            Line((2.294457731, 3.635904402), (2.179670369, 3.79968432))
            ThreePointArc((2.179670369, 3.79968432), (0.290420907, 1.354372209), (-0.187450803, 0.069729452))
            Line((-0.187450803, 0.069729452), (0.008703746, -0.199810522))
            ThreePointArc((0.008703746, -0.199810522), (1.677646948, -0.16347817), (3.346590151, -0.199810522))
            Line((3.346590151, -0.199810522), (3.355293896, 0))
        make_face()
    extrude(amount=3.175)
    # the kernel refuses this fillet: 2 mm, written as the material it takes off along each edge

    # Fillet4
    # the kernel refuses this fillet: 2 mm, written as the material it adds along each edge
    with BuildSketch(Plane(origin=(-161.574237648, -101.02095354, 0), x_dir=(-0.12352184424769684, 0.9923418533920898, 0), z_dir=(0, 0, 1))) as fillet4_piece_1:
        with BuildLine():
            CenterArc((3.442331352, -1.998105223), FILLET4_R, 92.494227137, 142.480562551)
            Line((2.294457731, -3.635904402), (2.179670369, -3.79968432))
            ThreePointArc((2.179670369, -3.79968432), (0.290420907, -1.354372209), (-0.187450803, -0.069729452))
            Line((-0.187450803, -0.069729452), (0.008703746, 0.199810522))
            ThreePointArc((0.008703746, 0.199810522), (1.677646948, 0.16347817), (3.346590151, 0.199810522))
            Line((3.346590151, 0.199810522), (3.355293896, 0))
        make_face()
    extrude(amount=3.175)
    # the kernel refuses this fillet: 2 mm, written as the material it takes off along each edge


solid = part.part
